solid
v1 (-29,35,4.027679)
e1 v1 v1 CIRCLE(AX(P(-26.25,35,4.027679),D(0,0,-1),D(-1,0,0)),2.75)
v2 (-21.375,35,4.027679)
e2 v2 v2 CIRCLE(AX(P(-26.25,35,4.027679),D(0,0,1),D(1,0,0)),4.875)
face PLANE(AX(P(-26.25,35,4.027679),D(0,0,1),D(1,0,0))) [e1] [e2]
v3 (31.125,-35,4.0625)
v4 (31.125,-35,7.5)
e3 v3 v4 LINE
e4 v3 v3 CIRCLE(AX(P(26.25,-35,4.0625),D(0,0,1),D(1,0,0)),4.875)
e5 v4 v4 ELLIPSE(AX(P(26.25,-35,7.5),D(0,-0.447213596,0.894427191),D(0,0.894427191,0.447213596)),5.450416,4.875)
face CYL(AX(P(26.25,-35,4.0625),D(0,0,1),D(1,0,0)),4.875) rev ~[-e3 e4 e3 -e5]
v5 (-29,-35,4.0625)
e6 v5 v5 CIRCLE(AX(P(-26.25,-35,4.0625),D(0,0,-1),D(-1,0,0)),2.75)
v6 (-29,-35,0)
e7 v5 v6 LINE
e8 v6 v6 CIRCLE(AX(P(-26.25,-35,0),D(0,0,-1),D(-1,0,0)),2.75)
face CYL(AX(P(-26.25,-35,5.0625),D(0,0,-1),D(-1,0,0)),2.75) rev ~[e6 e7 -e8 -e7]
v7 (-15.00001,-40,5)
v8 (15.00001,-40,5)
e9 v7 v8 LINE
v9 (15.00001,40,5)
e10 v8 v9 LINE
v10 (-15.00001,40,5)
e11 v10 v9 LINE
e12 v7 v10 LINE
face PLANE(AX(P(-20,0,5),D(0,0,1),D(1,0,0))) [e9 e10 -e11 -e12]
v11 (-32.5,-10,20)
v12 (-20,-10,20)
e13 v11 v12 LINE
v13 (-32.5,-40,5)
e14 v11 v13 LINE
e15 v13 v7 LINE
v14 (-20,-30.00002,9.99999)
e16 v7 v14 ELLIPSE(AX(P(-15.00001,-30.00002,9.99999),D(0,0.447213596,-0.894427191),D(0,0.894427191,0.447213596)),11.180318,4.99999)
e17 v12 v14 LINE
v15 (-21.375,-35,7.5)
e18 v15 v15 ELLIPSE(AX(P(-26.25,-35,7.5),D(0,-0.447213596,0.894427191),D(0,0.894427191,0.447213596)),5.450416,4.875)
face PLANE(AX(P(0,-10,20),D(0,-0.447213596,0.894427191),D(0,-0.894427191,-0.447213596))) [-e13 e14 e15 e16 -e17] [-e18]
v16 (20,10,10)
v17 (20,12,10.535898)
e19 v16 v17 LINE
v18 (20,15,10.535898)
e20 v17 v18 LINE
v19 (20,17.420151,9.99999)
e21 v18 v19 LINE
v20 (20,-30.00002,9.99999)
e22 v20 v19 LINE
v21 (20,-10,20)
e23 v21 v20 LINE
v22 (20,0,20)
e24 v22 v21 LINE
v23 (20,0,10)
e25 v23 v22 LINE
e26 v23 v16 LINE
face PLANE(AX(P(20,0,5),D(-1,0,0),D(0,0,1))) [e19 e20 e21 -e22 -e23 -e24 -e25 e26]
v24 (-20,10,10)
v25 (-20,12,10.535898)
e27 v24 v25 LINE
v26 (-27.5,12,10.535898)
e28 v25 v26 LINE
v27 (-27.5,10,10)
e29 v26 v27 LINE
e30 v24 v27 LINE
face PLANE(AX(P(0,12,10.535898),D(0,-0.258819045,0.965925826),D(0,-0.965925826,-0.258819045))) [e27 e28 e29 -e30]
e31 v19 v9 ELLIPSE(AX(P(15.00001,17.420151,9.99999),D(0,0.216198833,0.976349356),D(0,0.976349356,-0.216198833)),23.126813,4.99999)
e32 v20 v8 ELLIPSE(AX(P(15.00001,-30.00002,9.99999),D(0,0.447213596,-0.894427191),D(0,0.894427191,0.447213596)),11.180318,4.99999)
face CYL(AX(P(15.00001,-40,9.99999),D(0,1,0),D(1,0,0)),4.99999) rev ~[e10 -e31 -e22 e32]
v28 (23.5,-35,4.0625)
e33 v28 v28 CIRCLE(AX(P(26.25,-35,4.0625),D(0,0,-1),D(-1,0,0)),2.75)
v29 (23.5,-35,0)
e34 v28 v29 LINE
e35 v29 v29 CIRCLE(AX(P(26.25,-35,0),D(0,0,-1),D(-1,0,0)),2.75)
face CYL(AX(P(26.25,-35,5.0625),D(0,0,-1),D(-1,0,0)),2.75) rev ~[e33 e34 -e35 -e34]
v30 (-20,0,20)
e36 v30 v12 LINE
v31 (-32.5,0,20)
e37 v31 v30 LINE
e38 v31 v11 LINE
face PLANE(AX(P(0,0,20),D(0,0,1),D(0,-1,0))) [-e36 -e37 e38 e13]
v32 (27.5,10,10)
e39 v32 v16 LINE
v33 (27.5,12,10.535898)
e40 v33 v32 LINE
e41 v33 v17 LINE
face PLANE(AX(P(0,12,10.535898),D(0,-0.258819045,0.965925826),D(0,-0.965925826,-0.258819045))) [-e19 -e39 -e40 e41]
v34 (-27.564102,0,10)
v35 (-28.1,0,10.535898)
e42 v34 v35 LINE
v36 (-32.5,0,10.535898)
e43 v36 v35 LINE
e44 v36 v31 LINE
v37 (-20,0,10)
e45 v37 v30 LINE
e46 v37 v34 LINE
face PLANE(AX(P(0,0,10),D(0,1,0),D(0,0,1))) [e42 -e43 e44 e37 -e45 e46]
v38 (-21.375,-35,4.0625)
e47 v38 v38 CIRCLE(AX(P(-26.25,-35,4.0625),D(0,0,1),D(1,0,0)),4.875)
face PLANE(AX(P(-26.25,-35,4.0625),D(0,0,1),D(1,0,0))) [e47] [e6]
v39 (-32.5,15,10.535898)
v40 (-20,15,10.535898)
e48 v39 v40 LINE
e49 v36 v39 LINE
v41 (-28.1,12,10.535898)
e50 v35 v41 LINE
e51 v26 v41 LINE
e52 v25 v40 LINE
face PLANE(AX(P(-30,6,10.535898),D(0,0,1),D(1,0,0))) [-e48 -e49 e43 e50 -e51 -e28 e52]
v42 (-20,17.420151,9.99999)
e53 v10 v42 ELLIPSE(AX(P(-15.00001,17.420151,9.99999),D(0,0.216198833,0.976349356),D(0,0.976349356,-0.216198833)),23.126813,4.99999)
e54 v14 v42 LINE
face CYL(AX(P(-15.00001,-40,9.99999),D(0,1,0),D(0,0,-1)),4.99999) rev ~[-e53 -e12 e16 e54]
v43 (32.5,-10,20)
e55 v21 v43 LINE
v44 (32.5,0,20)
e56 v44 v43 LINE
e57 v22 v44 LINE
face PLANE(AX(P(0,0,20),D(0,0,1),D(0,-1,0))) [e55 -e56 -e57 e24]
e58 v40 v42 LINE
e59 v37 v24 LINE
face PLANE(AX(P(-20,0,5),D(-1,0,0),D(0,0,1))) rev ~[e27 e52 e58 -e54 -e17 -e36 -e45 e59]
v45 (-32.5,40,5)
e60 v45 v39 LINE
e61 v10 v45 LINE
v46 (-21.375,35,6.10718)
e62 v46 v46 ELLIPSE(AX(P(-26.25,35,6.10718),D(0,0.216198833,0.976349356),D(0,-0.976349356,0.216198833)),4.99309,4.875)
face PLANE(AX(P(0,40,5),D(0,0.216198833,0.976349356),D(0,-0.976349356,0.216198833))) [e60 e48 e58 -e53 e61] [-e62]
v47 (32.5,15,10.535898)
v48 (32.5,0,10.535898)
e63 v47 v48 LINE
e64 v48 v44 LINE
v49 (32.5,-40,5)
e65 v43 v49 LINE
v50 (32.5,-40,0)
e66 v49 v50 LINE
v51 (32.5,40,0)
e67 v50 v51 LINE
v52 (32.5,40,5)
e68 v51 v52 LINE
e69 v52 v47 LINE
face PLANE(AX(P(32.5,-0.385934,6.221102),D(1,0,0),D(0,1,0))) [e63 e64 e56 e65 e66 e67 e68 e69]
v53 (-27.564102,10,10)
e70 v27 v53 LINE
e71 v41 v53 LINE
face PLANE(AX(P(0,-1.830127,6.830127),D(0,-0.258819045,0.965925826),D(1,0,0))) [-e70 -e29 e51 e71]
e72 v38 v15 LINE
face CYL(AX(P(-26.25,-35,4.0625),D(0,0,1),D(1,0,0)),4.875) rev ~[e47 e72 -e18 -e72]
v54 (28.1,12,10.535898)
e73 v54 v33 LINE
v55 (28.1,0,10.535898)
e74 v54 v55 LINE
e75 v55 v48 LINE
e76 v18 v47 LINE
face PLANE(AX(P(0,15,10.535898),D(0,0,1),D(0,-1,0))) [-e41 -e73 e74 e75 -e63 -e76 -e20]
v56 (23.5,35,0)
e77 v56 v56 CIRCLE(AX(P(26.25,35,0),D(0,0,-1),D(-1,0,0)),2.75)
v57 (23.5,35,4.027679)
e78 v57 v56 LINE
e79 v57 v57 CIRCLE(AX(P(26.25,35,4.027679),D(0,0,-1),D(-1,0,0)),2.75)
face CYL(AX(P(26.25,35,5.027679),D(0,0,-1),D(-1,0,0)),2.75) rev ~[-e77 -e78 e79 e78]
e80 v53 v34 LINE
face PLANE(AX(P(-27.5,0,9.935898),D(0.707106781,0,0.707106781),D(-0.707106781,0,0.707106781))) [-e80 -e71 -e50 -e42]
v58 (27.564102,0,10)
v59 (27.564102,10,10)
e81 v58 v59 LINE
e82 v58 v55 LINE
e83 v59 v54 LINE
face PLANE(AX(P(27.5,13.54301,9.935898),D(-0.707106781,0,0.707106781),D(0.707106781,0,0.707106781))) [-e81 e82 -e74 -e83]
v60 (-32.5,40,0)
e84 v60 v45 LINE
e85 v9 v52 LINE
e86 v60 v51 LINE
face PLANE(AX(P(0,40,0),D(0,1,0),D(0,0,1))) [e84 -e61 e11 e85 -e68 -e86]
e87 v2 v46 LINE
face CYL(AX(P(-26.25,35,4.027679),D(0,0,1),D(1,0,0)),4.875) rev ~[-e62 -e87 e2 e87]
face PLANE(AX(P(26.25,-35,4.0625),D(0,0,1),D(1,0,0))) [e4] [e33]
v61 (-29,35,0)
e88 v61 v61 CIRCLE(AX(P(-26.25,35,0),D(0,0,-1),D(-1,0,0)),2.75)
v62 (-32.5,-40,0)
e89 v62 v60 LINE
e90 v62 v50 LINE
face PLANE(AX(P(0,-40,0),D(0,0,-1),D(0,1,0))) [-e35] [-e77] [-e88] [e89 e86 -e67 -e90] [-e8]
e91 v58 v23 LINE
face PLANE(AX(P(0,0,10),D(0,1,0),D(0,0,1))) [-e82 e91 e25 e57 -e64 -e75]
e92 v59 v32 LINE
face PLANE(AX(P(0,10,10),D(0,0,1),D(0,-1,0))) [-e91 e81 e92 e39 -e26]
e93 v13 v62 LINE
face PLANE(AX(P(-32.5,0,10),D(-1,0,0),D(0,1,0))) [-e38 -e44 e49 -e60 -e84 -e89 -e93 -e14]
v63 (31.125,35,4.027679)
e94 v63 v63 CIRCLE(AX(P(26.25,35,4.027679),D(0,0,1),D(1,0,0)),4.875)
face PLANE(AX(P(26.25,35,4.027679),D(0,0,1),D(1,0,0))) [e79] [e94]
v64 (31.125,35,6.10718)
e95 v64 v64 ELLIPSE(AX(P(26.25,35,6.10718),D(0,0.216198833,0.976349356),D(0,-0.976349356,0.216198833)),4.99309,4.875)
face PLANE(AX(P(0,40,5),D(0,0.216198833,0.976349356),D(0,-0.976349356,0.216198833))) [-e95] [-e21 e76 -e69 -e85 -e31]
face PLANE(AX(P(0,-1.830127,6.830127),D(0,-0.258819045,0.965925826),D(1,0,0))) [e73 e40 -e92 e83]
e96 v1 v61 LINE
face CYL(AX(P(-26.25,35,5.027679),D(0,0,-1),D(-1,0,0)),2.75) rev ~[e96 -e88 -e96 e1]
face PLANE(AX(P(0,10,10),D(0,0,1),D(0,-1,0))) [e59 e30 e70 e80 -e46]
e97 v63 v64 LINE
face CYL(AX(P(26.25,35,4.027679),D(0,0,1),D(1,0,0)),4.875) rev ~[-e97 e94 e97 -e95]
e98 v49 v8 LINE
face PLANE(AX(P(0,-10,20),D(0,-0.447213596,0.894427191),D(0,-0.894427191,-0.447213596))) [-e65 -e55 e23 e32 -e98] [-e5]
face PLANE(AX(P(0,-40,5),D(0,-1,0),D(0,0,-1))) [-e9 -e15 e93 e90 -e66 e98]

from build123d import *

# Parameters (mm, degrees)
F1_DEPTH       = 32.5
F2_W           = 40
F2_H           = 15
F3_DEPTH       = 40.001
F3_DEPTH_BACK  = 40.001
F4_R           = 4.99999
F6_D           = 5.5
F6_START       = 4.9375
F6_START_2     = 4.9723205
F6_CBORE_D     = 9.75
F6_CBORE_DEPTH = 1
F7_W           = 5
F7_H           = 12
F8_DEPTH       = 0.5358983849
F9_T4_DEPTH    = 13.5430097928
F9_T10_DEPTH   = 13.5430097928


# Not quite as in the source:
# - a fillet or chamfer that OpenCascade refuses, or shapes differently, is made with other operations: its cross-section is extruded or revolved along the edge and cut away or added
# - a fillet or chamfer is up to 0.001 mm smaller than in the source, because OpenCascade refuses the exact size


with BuildPart() as f1:
    # F0 (on Right) → F1 (new body, symmetric)
    with BuildSketch(Plane.YZ):
        Polygon((0, 10), (0, 20), (-10, 20), (-40, 5), (-40, 0), (40, 0), (40, 5), (15, 10.5358983849), (12, 10.5358983849), (10, 10), align=None)
    extrude(amount=F1_DEPTH, both=True)

    # F2 (on Front) → F3 (cut, two sides)
    with BuildSketch(Plane.XZ) as f3_sk:
        with Locations((0, 12.5)):
            Rectangle(F2_W, F2_H)
    extrude(amount=-F3_DEPTH, mode=Mode.SUBTRACT)
    extrude(f3_sk.sketch, amount=F3_DEPTH_BACK, mode=Mode.SUBTRACT)

    # F4 (radius 5 in the source; OpenCascade refuses exactly that, so slightly less here)
    f4_edges = [f1.edges().sort_by_distance(p)[0] for p in [
        (20, 0, 5),
        (-20, 0, 5),
    ]]
    fillet(f4_edges, radius=F4_R)

    # F6 (through all)
    # its depths count from where the whole tool has entered the part; down to there all is cleared
    with Locations(Plane.XY.offset(10)):
        with Locations((-26.25, 35, -F6_START_2), (26.25, 35, -F6_START_2), (-26.25, -35, -F6_START), (26.25, -35, -F6_START)):
            CounterBoreHole(F6_D / 2, F6_CBORE_D / 2, F6_CBORE_DEPTH)

    # F7 (on face) → F8 (join, through all)
    with BuildSketch(Plane.XY.offset(10)):
        with Locations((-30, 6)):
            Rectangle(F7_W, F7_H)
        with Locations((30, 6)):
            Rectangle(F7_W, F7_H)
    extrude(amount=F8_DEPTH)

    # F9: chamfer of 0.6 on 2 edges, made by hand


with BuildPart() as f9_tool2:
    # F9_s3 → F9_t4 (new body)
    with BuildSketch(Plane.XZ.offset(-13.5430097928)):
        Polygon((27.5, 9.9358983849), (28.1, 10.5358983849), (27.5, 10.5358983849), align=None)
    extrude(amount=F9_T4_DEPTH)

    split(bisect_by=Plane(origin=(0, -1.8301270189, 6.8301270189), x_dir=(1, 0, 0), z_dir=(0, -0.2588190451, 0.9659258263)), keep=Keep.TOP)

    split(bisect_by=Plane.XY.offset(10), keep=Keep.TOP)


with BuildPart() as f1_1:
    add(f1.part)

    # F9_t1: cut F9_tool2
    add(f9_tool2.part, mode=Mode.SUBTRACT)


with BuildPart() as f9_tool8:
    # F9_s9 → F9_t10 (new body)
    with BuildSketch(Plane.XZ):
        Polygon((-27.5, 9.9358983849), (-28.1, 10.5358983849), (-27.5, 10.5358983849), align=None)
    extrude(amount=-F9_T10_DEPTH)

    split(bisect_by=Plane(origin=(0, -1.8301270189, 6.8301270189), x_dir=(1, 0, 0), z_dir=(0, -0.2588190451, 0.9659258263)), keep=Keep.TOP)

    split(bisect_by=Plane.XY.offset(10), keep=Keep.TOP)


with BuildPart() as f1_2:
    add(f1_1.part)

    # F9_t7: cut F9_tool8
    add(f9_tool8.part, mode=Mode.SUBTRACT)


solid = f1_2.part
